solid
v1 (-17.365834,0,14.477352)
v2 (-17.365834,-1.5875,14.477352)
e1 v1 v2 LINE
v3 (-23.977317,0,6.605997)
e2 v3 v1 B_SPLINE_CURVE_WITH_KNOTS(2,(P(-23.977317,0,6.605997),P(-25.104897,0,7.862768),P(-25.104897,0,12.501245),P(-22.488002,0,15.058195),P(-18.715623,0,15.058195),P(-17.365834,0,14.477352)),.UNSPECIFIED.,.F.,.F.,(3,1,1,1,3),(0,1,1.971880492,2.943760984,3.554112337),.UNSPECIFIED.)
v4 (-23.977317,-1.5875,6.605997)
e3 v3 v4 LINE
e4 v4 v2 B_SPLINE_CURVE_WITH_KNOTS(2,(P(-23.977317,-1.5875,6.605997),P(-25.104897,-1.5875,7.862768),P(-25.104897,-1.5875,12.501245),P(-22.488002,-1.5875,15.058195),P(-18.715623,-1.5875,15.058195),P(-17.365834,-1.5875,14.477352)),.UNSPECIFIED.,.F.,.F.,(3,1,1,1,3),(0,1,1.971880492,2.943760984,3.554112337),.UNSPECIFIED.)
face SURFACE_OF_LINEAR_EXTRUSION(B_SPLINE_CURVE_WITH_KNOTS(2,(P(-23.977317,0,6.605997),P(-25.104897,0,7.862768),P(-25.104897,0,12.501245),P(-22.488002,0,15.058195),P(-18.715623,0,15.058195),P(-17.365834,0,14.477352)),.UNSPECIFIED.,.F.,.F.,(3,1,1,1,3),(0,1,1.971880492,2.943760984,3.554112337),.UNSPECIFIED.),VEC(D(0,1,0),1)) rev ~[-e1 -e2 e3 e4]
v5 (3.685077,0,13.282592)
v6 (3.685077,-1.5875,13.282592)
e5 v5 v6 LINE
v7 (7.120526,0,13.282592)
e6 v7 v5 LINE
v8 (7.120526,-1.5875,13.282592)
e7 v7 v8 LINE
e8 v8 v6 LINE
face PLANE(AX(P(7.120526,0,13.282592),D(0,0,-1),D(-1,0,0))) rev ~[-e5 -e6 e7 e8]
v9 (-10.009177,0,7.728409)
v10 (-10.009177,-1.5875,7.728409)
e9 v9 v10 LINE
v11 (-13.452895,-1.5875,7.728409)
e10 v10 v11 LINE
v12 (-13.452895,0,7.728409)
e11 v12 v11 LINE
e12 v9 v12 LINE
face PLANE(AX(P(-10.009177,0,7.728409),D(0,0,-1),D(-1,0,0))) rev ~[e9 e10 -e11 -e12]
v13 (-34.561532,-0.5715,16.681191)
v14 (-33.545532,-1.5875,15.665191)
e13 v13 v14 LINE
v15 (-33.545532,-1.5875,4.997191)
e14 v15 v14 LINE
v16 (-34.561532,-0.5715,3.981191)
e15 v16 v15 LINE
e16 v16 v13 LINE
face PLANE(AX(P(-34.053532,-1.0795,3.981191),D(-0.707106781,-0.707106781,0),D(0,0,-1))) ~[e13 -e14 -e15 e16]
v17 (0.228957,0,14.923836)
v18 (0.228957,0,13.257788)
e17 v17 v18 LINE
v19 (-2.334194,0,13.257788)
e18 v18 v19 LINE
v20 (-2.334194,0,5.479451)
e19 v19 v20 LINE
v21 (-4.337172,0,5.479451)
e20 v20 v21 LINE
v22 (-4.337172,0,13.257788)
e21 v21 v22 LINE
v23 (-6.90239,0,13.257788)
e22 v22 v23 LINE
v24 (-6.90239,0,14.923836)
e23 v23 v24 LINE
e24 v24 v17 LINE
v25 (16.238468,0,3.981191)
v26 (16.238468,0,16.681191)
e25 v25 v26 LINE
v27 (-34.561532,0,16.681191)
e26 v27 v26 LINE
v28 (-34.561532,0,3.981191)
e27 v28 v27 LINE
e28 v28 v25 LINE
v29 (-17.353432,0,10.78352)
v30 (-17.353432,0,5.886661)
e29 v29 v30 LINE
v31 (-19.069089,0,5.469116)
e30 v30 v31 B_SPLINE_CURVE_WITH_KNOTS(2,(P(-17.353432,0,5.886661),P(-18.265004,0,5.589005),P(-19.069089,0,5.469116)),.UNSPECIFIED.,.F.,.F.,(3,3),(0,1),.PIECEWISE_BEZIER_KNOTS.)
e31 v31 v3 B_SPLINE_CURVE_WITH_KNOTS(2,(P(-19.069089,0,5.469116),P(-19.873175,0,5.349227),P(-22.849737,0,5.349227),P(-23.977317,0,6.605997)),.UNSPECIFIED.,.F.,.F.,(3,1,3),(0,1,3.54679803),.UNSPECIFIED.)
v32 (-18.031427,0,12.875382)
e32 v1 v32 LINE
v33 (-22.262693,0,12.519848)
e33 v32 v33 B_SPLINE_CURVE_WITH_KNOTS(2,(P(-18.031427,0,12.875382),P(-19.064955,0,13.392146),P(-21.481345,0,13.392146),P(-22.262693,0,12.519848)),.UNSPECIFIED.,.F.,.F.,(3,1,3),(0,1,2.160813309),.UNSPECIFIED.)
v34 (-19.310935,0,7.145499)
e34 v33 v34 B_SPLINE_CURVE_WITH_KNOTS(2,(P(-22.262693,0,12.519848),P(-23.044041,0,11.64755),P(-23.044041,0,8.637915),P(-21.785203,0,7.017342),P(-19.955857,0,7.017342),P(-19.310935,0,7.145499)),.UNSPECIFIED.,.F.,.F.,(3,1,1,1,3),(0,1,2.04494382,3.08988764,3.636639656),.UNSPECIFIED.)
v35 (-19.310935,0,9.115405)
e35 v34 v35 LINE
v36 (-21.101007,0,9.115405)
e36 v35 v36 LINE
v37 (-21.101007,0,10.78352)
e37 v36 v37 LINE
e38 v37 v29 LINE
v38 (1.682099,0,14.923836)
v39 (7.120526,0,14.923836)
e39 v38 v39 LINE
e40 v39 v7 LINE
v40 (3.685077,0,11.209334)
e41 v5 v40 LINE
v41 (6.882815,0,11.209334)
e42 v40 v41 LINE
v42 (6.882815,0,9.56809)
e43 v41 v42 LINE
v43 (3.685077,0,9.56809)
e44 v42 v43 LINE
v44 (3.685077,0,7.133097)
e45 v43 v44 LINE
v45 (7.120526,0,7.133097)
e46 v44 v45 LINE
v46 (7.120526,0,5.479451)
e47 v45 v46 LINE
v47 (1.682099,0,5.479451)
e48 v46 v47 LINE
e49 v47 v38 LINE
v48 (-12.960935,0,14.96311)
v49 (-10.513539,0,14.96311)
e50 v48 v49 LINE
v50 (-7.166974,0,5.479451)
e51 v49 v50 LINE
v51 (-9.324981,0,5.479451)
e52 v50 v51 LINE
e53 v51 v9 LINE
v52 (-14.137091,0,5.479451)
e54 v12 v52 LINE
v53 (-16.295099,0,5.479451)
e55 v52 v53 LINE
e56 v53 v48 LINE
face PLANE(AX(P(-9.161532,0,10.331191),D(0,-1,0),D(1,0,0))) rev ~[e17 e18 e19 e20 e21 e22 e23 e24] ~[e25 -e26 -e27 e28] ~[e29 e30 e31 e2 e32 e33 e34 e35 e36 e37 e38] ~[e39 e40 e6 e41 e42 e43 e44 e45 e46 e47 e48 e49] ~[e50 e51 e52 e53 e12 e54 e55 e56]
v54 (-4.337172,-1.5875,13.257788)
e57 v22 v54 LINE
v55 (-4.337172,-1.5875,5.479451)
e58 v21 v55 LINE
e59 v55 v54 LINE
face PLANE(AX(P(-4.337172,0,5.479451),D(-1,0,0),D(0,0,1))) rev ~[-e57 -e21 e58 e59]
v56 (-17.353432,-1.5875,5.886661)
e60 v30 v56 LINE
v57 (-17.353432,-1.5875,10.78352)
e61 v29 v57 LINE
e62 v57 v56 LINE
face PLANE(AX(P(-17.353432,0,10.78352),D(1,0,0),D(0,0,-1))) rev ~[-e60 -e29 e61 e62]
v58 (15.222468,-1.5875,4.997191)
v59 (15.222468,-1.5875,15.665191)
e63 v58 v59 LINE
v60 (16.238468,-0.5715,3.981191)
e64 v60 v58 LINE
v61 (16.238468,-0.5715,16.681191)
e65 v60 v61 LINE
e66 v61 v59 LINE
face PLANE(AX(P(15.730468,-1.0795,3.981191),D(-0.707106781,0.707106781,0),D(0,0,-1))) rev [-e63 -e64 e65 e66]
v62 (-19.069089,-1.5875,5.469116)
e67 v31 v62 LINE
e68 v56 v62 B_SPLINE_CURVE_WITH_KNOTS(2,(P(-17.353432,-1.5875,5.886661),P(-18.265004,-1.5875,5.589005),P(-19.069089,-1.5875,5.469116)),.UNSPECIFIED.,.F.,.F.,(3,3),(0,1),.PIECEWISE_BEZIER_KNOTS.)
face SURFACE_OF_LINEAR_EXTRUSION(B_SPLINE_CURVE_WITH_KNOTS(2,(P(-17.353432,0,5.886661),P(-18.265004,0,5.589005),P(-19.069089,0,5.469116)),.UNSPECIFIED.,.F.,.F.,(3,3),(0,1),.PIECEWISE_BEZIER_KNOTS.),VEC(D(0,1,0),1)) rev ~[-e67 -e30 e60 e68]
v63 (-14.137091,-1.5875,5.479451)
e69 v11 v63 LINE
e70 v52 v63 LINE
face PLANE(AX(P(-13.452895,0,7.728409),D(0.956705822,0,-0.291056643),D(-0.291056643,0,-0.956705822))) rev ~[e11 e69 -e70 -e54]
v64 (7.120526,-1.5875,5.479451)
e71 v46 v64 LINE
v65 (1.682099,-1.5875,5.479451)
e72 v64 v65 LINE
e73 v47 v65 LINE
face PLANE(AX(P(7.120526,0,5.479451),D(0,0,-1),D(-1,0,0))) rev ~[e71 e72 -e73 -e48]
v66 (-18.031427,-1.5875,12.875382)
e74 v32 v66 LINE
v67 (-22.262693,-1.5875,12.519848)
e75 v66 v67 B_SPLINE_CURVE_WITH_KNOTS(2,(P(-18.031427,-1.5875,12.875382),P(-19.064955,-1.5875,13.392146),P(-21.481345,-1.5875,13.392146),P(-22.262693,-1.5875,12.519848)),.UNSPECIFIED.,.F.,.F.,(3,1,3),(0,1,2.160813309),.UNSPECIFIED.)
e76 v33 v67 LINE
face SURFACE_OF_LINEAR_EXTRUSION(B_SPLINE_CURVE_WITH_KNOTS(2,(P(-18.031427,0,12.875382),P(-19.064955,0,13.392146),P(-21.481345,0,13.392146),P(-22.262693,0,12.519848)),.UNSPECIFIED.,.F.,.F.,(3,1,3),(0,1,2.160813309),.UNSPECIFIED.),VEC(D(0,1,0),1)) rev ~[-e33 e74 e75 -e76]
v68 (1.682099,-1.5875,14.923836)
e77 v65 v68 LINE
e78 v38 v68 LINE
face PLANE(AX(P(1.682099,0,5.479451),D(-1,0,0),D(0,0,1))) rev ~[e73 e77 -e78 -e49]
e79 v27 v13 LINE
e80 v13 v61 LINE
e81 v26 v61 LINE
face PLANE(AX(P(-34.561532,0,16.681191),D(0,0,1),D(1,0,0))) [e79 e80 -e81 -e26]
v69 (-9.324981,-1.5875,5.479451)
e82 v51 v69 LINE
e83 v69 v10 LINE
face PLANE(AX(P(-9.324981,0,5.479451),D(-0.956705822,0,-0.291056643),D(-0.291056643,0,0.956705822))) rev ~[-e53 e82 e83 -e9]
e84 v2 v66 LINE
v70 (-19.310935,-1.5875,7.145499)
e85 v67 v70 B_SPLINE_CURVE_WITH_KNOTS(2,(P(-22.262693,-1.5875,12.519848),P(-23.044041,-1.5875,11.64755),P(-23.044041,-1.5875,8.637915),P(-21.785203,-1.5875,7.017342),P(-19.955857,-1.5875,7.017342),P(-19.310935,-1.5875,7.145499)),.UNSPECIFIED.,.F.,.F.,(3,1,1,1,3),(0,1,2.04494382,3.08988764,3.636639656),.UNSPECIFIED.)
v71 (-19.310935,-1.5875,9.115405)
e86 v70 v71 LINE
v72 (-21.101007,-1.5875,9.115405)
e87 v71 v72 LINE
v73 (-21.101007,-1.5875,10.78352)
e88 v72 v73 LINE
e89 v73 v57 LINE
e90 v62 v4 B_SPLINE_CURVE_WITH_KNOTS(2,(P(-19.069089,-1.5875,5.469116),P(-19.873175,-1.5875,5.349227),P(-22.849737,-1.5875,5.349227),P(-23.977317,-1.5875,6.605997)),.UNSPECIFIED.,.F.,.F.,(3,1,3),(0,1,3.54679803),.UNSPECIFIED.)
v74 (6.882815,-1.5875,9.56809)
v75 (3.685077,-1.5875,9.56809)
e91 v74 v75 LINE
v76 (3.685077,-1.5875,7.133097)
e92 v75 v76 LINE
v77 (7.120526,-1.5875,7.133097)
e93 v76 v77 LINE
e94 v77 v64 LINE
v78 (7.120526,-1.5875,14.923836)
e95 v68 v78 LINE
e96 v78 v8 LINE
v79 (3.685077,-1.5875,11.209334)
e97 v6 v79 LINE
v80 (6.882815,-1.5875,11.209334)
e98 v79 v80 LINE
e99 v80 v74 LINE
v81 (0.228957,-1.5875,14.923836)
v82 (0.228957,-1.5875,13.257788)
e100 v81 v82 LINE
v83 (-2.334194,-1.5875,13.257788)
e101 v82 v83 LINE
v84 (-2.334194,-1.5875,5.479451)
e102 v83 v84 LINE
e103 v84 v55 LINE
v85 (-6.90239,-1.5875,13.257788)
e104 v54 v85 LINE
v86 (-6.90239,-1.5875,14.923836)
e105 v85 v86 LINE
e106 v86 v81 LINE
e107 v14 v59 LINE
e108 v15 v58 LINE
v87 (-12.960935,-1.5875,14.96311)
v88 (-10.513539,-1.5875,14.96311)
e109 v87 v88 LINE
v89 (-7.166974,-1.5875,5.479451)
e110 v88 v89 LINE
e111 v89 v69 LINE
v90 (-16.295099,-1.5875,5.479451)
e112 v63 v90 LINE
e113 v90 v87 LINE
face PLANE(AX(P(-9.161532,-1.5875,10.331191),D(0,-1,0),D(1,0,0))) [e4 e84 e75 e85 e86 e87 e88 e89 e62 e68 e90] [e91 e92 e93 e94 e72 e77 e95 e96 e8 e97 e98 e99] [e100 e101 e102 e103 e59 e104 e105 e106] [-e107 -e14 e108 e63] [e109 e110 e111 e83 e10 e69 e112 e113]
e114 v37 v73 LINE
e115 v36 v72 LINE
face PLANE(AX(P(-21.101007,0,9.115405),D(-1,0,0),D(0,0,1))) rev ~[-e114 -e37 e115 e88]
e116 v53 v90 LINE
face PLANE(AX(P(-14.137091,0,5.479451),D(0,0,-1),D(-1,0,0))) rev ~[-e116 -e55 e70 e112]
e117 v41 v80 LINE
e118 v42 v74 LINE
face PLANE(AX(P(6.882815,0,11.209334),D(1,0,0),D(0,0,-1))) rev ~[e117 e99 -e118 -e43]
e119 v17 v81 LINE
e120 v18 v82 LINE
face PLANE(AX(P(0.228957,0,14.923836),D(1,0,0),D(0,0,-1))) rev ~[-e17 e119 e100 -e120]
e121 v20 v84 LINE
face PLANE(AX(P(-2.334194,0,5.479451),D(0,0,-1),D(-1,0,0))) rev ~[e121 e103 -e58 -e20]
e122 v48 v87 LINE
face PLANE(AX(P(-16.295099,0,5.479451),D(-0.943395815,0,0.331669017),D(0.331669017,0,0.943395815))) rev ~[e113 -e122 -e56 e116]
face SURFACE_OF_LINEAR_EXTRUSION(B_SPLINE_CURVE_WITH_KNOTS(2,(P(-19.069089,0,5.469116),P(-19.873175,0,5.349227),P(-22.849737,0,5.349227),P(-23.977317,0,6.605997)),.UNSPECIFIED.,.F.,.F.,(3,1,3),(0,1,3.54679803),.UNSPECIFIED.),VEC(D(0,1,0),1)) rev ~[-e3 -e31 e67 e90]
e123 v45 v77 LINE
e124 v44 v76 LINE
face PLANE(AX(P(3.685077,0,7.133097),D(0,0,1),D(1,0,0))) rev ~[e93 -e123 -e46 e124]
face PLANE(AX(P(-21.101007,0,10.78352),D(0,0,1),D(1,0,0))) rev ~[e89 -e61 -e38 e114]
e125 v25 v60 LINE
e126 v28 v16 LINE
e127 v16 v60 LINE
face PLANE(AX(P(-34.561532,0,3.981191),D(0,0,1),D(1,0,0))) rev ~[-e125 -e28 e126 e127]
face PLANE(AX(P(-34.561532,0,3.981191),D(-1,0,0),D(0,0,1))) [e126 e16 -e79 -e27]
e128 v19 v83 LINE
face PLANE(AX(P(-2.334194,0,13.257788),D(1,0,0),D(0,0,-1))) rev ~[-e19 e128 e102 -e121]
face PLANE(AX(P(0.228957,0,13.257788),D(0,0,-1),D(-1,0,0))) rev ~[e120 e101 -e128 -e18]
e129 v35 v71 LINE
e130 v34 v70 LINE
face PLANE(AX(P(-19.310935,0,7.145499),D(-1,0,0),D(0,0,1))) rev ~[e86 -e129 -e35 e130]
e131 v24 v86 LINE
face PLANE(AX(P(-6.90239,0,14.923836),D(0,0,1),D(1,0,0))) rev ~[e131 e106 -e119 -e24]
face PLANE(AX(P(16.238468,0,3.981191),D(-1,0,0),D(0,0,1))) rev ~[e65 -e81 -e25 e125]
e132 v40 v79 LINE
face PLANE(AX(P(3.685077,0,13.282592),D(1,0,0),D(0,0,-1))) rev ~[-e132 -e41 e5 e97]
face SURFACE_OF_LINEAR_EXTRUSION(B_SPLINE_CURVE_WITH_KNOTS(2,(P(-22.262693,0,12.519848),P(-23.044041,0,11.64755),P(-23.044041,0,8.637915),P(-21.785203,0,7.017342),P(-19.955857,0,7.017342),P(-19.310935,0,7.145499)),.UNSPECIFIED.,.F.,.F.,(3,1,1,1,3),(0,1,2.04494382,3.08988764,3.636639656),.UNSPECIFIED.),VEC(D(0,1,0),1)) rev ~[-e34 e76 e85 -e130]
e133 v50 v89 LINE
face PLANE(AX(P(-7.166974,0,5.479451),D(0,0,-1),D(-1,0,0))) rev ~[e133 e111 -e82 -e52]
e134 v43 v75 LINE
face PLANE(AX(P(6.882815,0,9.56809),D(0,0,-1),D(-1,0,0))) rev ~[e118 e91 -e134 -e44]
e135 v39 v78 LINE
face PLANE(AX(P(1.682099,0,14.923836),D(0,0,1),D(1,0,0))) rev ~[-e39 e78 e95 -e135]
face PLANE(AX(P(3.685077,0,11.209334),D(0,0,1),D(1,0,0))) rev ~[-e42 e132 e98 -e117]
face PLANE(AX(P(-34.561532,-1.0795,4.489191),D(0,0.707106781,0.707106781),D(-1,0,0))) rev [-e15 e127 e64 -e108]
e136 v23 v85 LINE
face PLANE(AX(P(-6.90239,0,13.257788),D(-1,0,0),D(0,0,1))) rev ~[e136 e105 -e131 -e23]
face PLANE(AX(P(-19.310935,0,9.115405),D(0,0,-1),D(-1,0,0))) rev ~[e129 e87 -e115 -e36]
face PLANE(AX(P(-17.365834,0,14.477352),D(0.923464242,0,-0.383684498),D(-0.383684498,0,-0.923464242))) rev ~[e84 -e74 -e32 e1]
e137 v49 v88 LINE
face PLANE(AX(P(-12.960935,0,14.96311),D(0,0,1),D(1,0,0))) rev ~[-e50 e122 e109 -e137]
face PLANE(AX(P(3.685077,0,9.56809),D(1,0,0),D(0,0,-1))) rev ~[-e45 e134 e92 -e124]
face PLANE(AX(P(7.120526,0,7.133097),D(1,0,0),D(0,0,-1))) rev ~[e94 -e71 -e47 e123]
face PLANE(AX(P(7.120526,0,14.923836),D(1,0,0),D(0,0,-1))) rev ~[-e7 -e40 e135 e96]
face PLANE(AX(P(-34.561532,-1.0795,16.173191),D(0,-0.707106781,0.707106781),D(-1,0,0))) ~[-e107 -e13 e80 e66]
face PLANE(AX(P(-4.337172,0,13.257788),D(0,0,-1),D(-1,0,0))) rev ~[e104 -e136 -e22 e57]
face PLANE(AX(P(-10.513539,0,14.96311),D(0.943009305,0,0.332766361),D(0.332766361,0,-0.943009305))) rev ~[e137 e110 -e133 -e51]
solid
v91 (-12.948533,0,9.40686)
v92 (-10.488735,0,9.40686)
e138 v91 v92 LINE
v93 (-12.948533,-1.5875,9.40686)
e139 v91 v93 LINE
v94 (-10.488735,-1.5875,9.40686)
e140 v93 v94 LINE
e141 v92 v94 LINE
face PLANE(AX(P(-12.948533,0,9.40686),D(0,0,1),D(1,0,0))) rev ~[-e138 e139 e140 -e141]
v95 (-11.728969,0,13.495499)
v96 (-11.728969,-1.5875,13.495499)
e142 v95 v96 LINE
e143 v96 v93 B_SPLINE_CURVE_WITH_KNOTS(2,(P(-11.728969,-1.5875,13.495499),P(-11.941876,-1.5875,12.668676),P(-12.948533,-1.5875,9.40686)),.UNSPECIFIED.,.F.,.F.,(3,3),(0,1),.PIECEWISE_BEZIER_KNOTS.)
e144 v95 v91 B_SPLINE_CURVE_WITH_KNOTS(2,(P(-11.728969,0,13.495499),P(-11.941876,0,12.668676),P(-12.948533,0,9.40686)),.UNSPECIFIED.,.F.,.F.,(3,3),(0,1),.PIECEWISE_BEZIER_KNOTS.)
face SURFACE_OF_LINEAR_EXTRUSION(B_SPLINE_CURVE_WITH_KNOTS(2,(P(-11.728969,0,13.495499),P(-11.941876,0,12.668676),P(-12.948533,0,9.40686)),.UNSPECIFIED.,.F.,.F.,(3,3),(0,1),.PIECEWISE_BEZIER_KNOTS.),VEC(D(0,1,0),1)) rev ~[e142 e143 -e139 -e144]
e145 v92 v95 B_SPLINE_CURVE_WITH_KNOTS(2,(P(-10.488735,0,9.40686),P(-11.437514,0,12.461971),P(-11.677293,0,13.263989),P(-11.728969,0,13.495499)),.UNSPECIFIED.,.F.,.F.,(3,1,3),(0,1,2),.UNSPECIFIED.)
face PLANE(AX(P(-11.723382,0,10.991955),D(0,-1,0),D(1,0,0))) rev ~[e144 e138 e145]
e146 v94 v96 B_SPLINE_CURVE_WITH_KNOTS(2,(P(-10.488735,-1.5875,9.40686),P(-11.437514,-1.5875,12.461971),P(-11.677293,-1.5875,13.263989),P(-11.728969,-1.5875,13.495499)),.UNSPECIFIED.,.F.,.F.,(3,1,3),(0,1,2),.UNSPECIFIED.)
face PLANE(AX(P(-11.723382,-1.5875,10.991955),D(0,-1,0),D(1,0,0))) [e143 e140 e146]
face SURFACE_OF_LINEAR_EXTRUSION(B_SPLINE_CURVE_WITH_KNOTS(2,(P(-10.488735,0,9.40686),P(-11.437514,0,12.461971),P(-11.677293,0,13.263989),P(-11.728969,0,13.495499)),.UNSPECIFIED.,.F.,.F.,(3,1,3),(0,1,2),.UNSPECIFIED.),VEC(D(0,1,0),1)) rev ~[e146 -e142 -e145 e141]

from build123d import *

# Parameters (mm, degrees)
F0_W     = 50.8
F0_H     = 12.7
F1_DEPTH = 1.5875
F2_SIZE  = 1.016


# Not quite as in the source:
# - a feature names something its author has since deleted; it is built from what else it names


with BuildPart() as f1:
    # F0 (on Front) → F1 (new body)
    with BuildSketch(Plane.XZ):
        with Locations((-9.1615320603, 10.3311909613)):
            Rectangle(F0_W, F0_H)
        with BuildLine():
            Line((-21.1010067493, 9.1154048977), (-21.1010067493, 10.7835201321))
            Line((-21.1010067493, 10.7835201321), (-17.3534318796, 10.7835201321))
            Line((-17.3534318796, 10.7835201321), (-17.3534318796, 5.8866614081))
            add(Edge.make_bspline(
                [(-17.3534318796, 5.8866614081), (-18.2650041452, 5.5890051581), (-19.0690894316, 5.4691158352)],
                knots=[0, 0, 0, 1, 1, 1], degree=2))
            add(Edge.make_bspline(
                [(-19.0690894316, 5.4691158352), (-19.8731747181, 5.3492265123), (-20.7123999785, 5.3492265123)],
                knots=[0, 0, 0, 1, 1, 1], degree=2))
            add(Edge.make_bspline(
                [(-20.7123999785, 5.3492265123), (-22.8497372181, 5.3492265123), (-23.9773169707, 6.6059973456)],
                knots=[0, 0, 0, 1, 1, 1], degree=2))
            add(Edge.make_bspline(
                [(-23.9773169707, 6.6059973456), (-25.1048967233, 7.862768179), (-25.1048967233, 10.2150793769)],
                knots=[0, 0, 0, 1, 1, 1], degree=2))
            add(Edge.make_bspline(
                [(-25.1048967233, 10.2150793769), (-25.1048967233, 12.5012447415), (-23.7964494577, 13.7797196764)],
                knots=[0, 0, 0, 1, 1, 1], degree=2))
            add(Edge.make_bspline(
                [(-23.7964494577, 13.7797196764), (-22.4880021921, 15.0581946113), (-20.1708309681, 15.0581946113)],
                knots=[0, 0, 0, 1, 1, 1], degree=2))
            add(Edge.make_bspline(
                [(-20.1708309681, 15.0581946113), (-18.7156226348, 15.0581946113), (-17.3658342233, 14.4773515123)],
                knots=[0, 0, 0, 1, 1, 1], degree=2))
            Line((-17.3658342233, 14.4773515123), (-18.0314266712, 12.8753821113))
            add(Edge.make_bspline(
                [(-18.0314266712, 12.8753821113), (-19.0649553171, 13.3921464342), (-20.1832333118, 13.3921464342)],
                knots=[0, 0, 0, 1, 1, 1], degree=2))
            add(Edge.make_bspline(
                [(-20.1832333118, 13.3921464342), (-21.481345291, 13.3921464342), (-22.2626929473, 12.5198482571)],
                knots=[0, 0, 0, 1, 1, 1], degree=2))
            add(Edge.make_bspline(
                [(-22.2626929473, 12.5198482571), (-23.0440406035, 11.64755008), (-23.0440406035, 10.1758052883)],
                knots=[0, 0, 0, 1, 1, 1], degree=2))
            add(Edge.make_bspline(
                [(-23.0440406035, 10.1758052883), (-23.0440406035, 8.6379146633), (-22.4146216582, 7.827628205)],
                knots=[0, 0, 0, 1, 1, 1], degree=2))
            add(Edge.make_bspline(
                [(-22.4146216582, 7.827628205), (-21.7852027129, 7.0173417467), (-20.5842424264, 7.0173417467)],
                knots=[0, 0, 0, 1, 1, 1], degree=2))
            add(Edge.make_bspline(
                [(-20.5842424264, 7.0173417467), (-19.9558570098, 7.0173417467), (-19.3109351348, 7.1454992988)],
                knots=[0, 0, 0, 1, 1, 1], degree=2))
            Line((-19.3109351348, 7.1454992988), (-19.3109351348, 9.1154048977))
            Line((-19.3109351348, 9.1154048977), (-21.1010067493, 9.1154048977))
        make_face(mode=Mode.SUBTRACT)
        Polygon((-7.1669735462, 5.4794511217), (-9.3249813587, 5.4794511217), (-10.0091773223, 7.728409455), (-13.4528947702, 7.728409455), (-14.1370907337, 5.4794511217), (-16.2950985462, 5.4794511217), (-12.9609351348, 14.9631099758), (-10.5135393014, 14.9631099758), align=None, mode=Mode.SUBTRACT)
        Polygon((-2.3341935983, 13.2577877102), (-2.3341935983, 5.4794511217), (-4.3371721139, 5.4794511217), (-4.3371721139, 13.2577877102), (-6.9023902129, 13.2577877102), (-6.9023902129, 14.9238358873), (0.2289574434, 14.9238358873), (0.2289574434, 13.2577877102), align=None, mode=Mode.SUBTRACT)
        Polygon((7.1205264538, 7.133096955), (7.1205264538, 5.4794511217), (1.6820987194, 5.4794511217), (1.6820987194, 14.9238358873), (7.1205264538, 14.9238358873), (7.1205264538, 13.2825923977), (3.685077235, 13.2825923977), (3.685077235, 11.2093339342), (6.8828148652, 11.2093339342), (6.8828148652, 9.5680904446), (3.685077235, 9.5680904446), (3.685077235, 7.133096955), align=None, mode=Mode.SUBTRACT)
    extrude(amount=F1_DEPTH)

    # F2
    f2_edges = [f1.edges().sort_by_distance(p)[0] for p in [
        (-9.161532, -1.5875, 3.981191),
        (-34.561532, -1.5875, 10.331191),
        (-9.161532, -1.5875, 16.681191),
        (16.238468, -1.5875, 10.331191),
    ]]
    chamfer(f2_edges, length=F2_SIZE)


with BuildPart() as f1b:
    # F0 (on Front) → F1, piece 2 (new body)
    with BuildSketch(Plane.XZ):
        with BuildLine():
            Line((-12.948532791, 9.4068599758), (-10.4887346139, 9.4068599758))
            add(Edge.make_bspline(
                [(-10.4887346139, 9.4068599758), (-11.4375139108, 12.4619706529), (-11.5574032337, 12.8629797675)],
                knots=[0, 0, 0, 1, 1, 1], degree=2))
            add(Edge.make_bspline(
                [(-11.5574032337, 12.8629797675), (-11.6772925566, 13.2639888821), (-11.7289689889, 13.4954992988)],
                knots=[0, 0, 0, 1, 1, 1], degree=2))
            add(Edge.make_bspline(
                [(-11.7289689889, 13.4954992988), (-11.94187589, 12.6686763821), (-12.948532791, 9.4068599758)],
                knots=[0, 0, 0, 1, 1, 1], degree=2))
        make_face()
    extrude(amount=F1_DEPTH)


solid = Compound([f1.part, f1b.part])
